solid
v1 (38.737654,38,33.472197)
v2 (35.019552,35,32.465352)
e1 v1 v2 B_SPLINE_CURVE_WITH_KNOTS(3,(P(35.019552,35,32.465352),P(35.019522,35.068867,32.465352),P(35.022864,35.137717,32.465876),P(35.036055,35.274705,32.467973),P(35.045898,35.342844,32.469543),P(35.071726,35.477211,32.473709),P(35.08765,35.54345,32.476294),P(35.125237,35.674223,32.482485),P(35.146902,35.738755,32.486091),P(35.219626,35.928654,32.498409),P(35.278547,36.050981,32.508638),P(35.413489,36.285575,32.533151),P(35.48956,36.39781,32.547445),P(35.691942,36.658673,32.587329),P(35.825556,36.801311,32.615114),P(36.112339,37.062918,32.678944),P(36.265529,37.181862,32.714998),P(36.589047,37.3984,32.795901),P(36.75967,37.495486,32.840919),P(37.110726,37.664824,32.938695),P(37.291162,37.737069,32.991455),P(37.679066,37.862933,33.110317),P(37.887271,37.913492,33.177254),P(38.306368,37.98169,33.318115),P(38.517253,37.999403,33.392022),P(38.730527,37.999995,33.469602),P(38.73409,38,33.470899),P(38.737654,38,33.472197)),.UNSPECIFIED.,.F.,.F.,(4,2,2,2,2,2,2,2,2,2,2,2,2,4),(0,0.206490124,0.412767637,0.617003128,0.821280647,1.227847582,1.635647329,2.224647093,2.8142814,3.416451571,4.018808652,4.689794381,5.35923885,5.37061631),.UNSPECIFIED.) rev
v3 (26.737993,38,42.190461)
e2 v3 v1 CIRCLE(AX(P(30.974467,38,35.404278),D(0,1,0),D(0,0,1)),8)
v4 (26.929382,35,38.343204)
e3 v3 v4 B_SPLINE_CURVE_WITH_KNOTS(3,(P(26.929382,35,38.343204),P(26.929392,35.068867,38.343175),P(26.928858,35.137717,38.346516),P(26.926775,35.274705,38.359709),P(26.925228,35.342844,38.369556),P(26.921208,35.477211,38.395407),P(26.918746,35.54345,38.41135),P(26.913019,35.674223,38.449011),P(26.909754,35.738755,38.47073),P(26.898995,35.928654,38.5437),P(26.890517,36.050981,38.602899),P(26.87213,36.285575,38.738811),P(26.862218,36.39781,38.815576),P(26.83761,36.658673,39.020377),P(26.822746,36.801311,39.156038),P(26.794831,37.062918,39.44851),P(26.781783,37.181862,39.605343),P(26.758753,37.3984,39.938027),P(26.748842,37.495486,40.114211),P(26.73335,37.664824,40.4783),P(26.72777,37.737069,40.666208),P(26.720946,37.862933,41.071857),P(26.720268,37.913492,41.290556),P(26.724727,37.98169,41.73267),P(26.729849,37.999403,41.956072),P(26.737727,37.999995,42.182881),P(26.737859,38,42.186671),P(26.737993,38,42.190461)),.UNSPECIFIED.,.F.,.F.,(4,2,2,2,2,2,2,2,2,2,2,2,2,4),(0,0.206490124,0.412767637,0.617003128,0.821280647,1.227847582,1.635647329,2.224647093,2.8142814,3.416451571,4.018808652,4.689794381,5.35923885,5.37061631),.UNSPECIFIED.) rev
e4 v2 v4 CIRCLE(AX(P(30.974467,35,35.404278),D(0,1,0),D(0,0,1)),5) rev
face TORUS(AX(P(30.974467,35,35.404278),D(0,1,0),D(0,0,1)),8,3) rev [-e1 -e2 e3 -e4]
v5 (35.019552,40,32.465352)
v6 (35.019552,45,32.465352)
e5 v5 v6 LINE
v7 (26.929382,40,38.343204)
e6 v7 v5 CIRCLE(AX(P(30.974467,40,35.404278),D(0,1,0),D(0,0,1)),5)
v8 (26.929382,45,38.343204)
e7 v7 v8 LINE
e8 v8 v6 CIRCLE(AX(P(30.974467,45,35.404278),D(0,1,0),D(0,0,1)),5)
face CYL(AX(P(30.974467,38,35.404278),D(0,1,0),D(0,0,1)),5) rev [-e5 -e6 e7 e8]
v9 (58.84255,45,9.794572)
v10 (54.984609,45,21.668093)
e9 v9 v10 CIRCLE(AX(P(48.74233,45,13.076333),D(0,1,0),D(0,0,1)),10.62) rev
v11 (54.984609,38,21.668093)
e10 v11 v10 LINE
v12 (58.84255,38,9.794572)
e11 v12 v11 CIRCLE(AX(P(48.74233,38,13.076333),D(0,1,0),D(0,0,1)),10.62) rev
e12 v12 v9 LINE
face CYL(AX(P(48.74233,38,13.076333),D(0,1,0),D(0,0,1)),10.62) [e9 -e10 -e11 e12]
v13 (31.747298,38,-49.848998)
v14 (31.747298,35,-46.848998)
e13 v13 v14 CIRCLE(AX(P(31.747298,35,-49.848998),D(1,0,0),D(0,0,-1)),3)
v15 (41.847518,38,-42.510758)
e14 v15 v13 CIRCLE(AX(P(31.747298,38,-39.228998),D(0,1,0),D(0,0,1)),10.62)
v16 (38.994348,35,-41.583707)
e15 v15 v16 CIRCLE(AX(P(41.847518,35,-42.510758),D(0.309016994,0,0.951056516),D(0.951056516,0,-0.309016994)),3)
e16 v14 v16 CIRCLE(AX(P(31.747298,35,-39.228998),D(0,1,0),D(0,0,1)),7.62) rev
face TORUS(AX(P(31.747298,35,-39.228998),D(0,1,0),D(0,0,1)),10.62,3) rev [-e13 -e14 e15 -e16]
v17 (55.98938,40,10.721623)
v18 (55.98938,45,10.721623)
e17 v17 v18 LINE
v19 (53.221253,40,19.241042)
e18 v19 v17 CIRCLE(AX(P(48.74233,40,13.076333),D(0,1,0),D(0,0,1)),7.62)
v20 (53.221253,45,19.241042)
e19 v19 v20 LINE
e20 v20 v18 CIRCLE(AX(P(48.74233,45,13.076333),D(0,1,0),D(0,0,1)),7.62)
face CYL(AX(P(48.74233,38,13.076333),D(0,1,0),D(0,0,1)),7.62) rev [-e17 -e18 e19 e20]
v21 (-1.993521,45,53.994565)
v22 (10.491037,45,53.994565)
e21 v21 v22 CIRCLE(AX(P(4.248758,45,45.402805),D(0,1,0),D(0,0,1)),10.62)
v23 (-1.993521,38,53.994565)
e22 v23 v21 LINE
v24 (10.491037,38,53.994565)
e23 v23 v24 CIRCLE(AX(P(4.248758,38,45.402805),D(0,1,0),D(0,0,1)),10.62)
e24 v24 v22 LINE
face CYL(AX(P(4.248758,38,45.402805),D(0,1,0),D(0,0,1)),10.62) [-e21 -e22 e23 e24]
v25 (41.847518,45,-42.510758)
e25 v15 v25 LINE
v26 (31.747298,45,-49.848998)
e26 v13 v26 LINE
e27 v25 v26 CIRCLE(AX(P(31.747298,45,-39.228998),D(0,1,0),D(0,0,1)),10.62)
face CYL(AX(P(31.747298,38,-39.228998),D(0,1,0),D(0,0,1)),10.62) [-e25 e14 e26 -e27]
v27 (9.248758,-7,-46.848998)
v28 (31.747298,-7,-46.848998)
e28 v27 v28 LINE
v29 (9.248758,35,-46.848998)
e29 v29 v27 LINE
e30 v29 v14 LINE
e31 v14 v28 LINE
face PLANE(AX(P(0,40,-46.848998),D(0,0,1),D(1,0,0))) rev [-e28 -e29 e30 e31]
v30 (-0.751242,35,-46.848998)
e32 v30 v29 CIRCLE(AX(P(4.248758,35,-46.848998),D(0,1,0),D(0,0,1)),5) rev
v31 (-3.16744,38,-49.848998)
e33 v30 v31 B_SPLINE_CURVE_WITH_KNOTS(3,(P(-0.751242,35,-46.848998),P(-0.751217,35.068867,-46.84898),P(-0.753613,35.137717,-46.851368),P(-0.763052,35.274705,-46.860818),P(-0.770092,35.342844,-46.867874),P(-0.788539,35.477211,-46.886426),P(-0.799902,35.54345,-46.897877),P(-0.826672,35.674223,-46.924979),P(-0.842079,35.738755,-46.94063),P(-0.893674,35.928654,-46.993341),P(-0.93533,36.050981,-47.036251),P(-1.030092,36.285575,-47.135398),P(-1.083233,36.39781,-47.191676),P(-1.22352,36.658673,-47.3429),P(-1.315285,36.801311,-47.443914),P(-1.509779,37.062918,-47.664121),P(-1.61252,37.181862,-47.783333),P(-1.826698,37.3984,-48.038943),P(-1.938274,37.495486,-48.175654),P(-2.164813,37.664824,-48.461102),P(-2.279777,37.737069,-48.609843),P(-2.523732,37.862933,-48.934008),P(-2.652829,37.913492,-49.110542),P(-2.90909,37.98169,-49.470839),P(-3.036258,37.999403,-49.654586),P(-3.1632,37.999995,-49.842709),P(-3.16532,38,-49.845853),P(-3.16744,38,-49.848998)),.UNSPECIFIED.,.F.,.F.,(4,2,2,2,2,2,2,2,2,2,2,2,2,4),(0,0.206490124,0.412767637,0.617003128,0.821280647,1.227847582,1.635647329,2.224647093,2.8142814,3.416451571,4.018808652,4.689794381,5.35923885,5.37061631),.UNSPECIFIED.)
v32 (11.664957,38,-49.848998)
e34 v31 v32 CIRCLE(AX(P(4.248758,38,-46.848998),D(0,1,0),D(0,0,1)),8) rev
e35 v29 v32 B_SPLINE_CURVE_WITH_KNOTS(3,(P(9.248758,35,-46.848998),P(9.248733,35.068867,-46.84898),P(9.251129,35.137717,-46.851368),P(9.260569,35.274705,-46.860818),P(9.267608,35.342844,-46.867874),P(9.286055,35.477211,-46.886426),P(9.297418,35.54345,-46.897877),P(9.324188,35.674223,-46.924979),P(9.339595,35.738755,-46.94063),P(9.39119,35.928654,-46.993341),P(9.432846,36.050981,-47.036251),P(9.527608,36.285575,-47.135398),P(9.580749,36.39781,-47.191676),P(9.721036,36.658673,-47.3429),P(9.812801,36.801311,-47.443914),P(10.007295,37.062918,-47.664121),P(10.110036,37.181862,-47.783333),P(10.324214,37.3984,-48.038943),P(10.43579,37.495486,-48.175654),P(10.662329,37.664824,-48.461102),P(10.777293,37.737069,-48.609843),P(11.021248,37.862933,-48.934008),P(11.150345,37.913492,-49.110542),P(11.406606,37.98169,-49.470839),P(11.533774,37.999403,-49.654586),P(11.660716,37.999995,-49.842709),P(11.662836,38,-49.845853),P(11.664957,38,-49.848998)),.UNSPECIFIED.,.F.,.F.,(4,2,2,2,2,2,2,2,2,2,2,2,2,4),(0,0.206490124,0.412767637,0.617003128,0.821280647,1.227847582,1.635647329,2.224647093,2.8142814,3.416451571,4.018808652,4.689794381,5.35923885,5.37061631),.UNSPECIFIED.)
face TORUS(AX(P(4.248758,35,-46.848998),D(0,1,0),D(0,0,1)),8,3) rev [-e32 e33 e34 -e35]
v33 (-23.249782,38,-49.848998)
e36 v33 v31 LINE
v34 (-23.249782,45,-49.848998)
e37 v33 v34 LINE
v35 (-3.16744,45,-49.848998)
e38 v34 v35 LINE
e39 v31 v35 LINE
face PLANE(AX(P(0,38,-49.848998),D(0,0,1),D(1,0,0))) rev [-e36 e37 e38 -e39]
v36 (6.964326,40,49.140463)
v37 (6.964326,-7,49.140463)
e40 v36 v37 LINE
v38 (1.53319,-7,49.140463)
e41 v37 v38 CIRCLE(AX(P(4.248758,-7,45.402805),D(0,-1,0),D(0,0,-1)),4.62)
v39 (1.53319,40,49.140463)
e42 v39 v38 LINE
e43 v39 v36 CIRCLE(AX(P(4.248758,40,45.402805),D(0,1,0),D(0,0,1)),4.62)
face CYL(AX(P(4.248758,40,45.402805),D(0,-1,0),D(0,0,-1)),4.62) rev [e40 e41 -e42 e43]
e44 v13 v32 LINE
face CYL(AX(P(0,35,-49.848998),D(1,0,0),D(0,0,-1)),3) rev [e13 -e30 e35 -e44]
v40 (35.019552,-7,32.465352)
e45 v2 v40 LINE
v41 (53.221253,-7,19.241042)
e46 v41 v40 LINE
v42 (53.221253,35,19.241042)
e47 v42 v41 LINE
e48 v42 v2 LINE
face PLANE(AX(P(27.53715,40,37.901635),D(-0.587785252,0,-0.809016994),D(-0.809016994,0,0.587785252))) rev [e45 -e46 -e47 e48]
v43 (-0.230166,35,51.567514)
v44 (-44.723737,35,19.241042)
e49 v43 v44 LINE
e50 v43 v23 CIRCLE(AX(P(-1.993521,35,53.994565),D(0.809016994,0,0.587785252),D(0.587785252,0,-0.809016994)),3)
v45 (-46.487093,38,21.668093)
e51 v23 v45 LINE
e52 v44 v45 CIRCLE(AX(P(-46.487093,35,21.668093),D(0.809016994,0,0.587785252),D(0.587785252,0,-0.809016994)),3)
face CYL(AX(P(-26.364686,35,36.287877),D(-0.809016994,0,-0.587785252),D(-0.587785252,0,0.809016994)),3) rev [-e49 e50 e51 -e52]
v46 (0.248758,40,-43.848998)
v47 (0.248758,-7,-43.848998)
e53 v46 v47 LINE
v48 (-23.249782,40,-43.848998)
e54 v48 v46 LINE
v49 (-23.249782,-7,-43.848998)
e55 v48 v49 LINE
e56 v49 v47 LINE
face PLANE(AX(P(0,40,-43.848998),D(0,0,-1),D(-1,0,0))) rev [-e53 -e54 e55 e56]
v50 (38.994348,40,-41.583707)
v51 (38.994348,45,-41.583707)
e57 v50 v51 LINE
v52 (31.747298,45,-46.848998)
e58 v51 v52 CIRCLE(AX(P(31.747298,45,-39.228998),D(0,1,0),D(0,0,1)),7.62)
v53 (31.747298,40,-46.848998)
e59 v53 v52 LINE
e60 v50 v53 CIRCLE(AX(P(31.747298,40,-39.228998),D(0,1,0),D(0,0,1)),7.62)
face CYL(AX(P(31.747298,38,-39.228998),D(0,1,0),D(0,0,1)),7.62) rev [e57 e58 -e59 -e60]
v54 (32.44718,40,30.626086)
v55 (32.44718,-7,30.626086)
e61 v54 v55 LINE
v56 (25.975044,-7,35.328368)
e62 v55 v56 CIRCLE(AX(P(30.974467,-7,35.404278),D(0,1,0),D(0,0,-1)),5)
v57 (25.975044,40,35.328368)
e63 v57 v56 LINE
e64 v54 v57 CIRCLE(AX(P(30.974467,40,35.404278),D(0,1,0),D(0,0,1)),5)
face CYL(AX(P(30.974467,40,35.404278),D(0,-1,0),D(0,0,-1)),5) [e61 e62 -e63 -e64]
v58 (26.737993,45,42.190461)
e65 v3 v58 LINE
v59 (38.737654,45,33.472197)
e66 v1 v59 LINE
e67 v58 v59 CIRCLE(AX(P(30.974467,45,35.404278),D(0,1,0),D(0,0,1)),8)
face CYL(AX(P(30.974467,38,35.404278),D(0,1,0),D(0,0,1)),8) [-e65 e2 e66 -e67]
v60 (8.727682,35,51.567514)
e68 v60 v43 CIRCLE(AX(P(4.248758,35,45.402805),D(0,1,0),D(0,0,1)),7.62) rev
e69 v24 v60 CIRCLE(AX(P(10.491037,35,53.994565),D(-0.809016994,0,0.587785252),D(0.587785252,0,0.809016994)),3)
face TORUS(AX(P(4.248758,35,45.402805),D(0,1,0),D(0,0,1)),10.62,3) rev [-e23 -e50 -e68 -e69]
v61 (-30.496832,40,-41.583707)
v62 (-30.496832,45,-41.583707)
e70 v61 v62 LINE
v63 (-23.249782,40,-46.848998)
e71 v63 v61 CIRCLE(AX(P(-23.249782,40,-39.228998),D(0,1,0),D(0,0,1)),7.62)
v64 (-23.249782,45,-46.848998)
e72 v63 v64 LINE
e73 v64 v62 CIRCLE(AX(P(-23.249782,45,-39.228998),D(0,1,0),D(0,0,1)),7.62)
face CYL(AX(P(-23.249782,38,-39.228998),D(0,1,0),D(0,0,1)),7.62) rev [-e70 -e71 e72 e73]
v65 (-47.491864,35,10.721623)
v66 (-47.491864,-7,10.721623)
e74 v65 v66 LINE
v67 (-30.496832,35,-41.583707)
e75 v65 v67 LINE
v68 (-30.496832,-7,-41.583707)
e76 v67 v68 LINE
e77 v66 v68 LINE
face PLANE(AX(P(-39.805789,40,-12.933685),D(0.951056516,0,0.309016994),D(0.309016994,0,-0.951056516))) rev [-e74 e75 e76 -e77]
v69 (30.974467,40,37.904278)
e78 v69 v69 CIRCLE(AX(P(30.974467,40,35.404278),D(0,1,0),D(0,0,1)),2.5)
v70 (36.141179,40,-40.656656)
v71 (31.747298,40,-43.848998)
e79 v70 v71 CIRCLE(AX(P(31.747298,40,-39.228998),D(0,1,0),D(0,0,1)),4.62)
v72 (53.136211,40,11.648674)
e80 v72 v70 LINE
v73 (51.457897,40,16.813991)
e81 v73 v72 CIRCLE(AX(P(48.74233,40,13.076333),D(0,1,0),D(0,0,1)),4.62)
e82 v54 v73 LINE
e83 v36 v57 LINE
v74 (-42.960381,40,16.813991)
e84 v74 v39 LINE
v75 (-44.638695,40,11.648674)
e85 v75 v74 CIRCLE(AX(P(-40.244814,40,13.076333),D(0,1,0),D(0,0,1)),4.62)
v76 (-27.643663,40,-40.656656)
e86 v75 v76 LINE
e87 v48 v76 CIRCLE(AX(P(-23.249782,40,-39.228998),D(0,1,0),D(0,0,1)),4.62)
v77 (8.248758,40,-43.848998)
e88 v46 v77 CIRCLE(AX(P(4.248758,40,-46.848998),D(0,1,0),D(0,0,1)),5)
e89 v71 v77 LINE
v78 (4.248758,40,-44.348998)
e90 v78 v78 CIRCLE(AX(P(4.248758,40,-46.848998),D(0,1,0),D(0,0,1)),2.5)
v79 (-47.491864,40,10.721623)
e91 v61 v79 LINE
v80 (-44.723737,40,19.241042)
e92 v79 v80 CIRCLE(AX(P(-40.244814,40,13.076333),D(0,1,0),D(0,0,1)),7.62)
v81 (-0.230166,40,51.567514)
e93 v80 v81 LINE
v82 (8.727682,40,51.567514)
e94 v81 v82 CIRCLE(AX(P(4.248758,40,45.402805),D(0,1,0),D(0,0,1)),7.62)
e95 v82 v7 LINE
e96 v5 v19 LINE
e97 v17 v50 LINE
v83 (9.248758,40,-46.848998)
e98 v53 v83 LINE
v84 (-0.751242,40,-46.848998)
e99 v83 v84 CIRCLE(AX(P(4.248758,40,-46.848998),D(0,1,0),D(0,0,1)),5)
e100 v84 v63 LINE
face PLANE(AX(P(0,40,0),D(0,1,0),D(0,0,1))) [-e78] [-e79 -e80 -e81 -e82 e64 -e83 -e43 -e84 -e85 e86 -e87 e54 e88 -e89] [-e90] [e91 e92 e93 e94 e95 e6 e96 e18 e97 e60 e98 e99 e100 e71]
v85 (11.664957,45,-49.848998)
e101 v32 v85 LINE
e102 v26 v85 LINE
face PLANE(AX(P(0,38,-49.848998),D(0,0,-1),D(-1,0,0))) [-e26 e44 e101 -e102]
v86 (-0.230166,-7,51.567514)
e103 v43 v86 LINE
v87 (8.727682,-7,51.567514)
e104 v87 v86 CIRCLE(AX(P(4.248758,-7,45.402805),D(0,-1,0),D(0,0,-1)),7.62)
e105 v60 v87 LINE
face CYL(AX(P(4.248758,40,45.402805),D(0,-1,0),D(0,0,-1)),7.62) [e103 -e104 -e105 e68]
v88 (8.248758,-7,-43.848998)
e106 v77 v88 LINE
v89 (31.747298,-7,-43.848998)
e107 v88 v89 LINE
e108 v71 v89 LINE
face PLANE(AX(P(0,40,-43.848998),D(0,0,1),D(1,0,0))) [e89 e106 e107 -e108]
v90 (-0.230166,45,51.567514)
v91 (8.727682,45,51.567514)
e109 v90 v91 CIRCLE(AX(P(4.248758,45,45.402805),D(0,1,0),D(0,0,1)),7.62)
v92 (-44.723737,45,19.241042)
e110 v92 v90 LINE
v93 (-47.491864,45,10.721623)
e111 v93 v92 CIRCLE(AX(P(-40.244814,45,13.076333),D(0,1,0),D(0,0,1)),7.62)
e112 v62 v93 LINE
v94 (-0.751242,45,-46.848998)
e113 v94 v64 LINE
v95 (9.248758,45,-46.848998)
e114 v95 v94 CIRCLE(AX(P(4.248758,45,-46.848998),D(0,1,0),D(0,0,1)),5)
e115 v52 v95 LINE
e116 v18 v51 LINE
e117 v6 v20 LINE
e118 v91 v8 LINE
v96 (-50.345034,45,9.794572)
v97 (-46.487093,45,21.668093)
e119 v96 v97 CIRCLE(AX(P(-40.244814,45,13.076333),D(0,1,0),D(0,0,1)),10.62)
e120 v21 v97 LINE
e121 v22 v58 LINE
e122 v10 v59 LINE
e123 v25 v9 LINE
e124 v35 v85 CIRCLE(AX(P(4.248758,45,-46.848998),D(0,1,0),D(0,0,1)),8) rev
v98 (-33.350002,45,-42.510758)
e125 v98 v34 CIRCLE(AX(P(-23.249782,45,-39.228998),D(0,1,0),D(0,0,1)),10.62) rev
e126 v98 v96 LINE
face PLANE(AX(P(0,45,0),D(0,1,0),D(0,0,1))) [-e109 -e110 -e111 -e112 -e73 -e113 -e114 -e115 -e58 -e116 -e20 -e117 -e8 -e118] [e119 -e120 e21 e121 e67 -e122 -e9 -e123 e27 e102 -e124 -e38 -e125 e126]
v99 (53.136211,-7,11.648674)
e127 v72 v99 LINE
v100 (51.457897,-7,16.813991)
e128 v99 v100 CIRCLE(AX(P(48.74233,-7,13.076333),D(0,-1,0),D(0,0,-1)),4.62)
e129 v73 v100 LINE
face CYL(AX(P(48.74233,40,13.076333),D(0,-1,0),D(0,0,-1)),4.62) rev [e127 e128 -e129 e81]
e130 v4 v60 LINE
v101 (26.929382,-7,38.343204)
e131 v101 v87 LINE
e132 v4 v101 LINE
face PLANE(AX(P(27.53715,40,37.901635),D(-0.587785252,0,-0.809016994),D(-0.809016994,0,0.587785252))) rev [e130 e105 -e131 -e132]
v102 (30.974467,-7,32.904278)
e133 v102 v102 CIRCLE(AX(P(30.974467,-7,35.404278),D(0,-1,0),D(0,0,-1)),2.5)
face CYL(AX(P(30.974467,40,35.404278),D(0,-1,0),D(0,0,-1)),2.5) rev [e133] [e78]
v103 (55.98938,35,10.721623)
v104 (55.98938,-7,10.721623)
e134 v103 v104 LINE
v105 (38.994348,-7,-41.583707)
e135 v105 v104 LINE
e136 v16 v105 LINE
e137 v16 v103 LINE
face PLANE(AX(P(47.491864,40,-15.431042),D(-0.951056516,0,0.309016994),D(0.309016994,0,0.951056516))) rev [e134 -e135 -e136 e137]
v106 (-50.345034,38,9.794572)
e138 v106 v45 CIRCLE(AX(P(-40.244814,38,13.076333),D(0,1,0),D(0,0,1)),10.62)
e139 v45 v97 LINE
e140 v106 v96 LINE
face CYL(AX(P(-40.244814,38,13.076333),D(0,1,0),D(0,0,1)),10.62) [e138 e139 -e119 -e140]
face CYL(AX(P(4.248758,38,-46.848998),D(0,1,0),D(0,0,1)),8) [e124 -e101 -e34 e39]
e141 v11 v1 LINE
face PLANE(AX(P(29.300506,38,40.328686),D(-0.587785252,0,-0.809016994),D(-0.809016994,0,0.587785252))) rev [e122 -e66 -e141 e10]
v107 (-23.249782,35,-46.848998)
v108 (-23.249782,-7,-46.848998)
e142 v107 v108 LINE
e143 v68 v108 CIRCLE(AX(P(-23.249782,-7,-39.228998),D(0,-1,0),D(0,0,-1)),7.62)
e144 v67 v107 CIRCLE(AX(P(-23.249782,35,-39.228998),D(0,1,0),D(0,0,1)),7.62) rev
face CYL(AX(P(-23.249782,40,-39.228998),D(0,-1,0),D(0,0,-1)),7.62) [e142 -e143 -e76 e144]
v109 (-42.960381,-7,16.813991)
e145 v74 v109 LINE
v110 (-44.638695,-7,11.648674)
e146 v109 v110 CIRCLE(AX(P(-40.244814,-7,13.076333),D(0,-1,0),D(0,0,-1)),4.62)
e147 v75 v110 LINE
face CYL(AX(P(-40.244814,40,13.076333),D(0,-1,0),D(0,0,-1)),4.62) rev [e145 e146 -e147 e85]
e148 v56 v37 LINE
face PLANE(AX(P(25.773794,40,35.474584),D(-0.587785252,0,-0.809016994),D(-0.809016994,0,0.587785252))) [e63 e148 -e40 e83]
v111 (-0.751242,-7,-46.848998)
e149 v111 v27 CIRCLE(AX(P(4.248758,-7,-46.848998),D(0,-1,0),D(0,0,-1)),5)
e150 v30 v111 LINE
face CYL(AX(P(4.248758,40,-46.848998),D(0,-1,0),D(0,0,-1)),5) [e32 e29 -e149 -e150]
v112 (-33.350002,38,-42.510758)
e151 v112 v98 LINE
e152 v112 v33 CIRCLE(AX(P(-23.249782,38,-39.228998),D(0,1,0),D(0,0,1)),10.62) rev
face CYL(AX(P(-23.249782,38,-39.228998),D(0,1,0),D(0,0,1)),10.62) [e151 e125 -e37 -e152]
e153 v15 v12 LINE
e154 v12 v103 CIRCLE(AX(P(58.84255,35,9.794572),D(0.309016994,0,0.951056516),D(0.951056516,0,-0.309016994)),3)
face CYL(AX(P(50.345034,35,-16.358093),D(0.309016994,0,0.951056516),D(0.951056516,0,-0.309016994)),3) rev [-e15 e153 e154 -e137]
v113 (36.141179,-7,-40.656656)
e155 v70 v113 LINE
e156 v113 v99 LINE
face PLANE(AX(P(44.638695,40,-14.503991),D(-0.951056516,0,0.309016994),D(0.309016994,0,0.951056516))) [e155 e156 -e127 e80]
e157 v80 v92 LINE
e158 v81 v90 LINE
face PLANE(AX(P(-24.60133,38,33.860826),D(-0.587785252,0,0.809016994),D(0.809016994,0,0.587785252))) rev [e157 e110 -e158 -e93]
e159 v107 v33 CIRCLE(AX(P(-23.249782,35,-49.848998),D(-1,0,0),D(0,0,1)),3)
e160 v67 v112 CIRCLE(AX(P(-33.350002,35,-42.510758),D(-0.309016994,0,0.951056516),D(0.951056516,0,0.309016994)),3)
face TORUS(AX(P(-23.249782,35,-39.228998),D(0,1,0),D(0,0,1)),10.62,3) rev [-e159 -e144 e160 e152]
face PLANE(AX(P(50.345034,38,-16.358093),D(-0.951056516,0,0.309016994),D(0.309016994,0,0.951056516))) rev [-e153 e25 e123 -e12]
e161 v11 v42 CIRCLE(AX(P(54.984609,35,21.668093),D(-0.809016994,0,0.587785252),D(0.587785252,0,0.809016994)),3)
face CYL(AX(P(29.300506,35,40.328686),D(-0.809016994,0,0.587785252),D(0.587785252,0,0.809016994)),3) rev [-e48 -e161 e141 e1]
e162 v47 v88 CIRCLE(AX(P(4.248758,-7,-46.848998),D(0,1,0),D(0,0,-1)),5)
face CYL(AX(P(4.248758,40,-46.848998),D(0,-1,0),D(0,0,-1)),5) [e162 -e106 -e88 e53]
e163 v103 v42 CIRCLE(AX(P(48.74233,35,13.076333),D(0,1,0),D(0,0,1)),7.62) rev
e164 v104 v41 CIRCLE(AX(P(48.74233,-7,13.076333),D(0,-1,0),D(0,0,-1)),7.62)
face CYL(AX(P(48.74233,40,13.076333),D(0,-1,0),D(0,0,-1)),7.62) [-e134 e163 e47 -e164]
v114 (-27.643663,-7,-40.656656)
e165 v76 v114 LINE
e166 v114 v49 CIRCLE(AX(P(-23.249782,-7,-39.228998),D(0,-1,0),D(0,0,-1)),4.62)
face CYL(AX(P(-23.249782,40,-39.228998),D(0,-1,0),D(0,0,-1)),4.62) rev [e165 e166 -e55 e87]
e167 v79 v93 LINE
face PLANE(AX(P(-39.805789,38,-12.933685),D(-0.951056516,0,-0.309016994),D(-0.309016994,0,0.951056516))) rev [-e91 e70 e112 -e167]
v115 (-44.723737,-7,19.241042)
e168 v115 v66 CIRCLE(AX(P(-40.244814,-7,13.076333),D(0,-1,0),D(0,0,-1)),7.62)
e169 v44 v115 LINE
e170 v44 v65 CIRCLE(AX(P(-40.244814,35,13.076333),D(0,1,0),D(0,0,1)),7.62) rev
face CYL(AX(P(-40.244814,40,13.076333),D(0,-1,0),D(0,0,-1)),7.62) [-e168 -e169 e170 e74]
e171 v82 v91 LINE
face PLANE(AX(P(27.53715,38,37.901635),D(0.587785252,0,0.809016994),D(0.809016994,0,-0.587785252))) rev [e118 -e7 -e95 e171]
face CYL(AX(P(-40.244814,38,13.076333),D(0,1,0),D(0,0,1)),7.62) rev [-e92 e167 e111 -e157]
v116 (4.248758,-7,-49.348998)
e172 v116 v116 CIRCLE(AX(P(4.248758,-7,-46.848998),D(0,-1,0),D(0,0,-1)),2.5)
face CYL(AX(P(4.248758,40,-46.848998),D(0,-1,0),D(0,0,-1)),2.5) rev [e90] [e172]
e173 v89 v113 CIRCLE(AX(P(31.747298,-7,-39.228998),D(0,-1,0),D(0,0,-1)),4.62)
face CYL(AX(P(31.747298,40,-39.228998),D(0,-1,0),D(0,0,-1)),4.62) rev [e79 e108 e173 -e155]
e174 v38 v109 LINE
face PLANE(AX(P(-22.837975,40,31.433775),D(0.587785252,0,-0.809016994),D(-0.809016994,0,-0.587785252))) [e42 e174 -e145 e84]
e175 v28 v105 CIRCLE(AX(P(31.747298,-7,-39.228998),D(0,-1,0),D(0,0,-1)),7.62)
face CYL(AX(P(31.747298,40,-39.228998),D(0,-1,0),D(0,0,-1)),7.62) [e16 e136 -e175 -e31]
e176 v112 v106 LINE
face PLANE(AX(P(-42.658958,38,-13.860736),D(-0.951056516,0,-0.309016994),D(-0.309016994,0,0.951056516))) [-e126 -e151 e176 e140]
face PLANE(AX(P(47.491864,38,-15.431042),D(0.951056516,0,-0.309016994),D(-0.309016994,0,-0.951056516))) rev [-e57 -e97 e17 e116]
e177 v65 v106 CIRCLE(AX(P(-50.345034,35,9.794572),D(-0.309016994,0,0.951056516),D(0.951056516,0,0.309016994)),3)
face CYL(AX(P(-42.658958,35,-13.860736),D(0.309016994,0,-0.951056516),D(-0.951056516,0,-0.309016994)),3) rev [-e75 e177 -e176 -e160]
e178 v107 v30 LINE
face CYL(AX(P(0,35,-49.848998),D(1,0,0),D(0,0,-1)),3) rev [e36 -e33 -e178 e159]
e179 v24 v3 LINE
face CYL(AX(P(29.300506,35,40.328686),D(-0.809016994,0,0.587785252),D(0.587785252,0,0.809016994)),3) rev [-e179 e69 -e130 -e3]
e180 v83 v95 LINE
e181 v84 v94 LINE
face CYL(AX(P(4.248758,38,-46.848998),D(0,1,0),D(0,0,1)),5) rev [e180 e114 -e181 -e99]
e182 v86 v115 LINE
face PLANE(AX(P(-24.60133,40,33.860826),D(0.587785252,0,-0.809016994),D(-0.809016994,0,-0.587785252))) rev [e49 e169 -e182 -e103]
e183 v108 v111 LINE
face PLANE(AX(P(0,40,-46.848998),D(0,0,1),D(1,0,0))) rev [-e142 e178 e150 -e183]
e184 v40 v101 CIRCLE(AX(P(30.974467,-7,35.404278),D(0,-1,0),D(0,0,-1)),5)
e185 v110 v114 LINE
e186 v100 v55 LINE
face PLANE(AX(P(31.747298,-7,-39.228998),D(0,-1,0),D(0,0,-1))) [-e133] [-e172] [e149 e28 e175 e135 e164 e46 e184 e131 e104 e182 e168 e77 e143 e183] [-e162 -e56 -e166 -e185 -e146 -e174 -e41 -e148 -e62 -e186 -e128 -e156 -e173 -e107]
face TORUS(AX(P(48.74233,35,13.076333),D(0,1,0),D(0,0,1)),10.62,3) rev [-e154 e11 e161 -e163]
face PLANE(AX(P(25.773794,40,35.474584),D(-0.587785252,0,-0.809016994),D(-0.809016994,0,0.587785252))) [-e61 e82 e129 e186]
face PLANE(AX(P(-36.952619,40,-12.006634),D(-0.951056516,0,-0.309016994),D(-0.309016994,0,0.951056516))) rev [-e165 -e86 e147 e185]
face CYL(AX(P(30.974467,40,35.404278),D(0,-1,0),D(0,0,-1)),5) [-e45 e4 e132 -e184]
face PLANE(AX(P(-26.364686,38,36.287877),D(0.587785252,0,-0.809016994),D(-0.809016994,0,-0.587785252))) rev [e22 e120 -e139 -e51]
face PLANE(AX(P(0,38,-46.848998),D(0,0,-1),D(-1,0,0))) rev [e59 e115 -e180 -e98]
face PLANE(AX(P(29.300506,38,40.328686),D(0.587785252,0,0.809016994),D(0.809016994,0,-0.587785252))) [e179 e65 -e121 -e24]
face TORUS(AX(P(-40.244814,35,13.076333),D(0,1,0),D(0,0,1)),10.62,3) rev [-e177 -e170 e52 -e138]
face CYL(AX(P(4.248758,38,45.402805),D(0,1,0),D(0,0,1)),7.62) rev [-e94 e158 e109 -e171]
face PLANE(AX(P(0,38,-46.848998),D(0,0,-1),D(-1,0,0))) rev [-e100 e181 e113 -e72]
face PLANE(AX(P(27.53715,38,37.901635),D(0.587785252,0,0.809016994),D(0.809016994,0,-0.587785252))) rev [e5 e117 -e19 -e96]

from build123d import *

# Parameters (mm, degrees)
SKETCH1_R                = 2.5
BOSS_EXTRUDE1_DEPTH      = 40
BOSS_EXTRUDE2_DEPTH      = 5
BOSS_EXTRUDE2_DEPTH_BACK = 2
FILLET1_R                = 3
BOSS_EXTRUDE3_START      = 7
SKETCH3_R                = 2.5
BOSS_EXTRUDE3_DEPTH      = 7


with BuildPart() as part:
    # Sketch1 → Boss-Extrude1 (new body)
    # profile 1 of 3: a face of its own
    with BuildSketch(Plane(origin=(0, 0, 0), x_dir=(1, 0, 0), z_dir=(0, 1, 0))):
        with BuildLine():
            Line((55.989380272, -10.721623107), (38.994348201, 41.58370731))
            ThreePointArc((38.994348201, 41.58370731), (36.22622117, 45.39370731), (31.747297547, 46.848997812))
            Line((31.747297547, 46.848997812), (9.248758018, 46.848997812))
            ThreePointArc((9.248758018, 46.848997812), (7.784291924, 50.384531718), (4.248758018, 51.848997812))
            Line((4.248758018, 51.848997812), (4.248758018, 50.848997812))
            ThreePointArc((4.248758018, 50.848997812), (1.420330893, 49.677424937), (0.248758018, 46.848997812))
            Line((0.248758018, 46.848997812), (-23.249781512, 46.848997812))
            ThreePointArc((-23.249781512, 46.848997812), (-27.728705135, 45.39370731), (-30.496832166, 41.58370731))
            Line((-30.496832166, 41.58370731), (-47.491864237, -10.721623107))
            ThreePointArc((-47.491864237, -10.721623107), (-47.491864237, -15.431042101), (-44.723737205, -19.241042101))
            Line((-44.723737205, -19.241042101), (-0.230165605, -51.567514092))
            ThreePointArc((-0.230165605, -51.567514092), (4.248758018, -53.022804594), (8.72768164, -51.567514092))
            Line((8.72768164, -51.567514092), (27.738399463, -37.755419106))
            ThreePointArc((27.738399463, -37.755419106), (30.34872958, -39.355031459), (33.325608449, -38.640346074))
            Line((33.325608449, -38.640346074), (33.913393702, -39.449363068))
            ThreePointArc((33.913393702, -39.449363068), (35.912909143, -36.186450422), (35.019552412, -32.465351835))
            Line((35.019552412, -32.465351835), (53.22125324, -19.241042101))
            ThreePointArc((53.22125324, -19.241042101), (55.989380272, -15.431042101), (55.989380272, -10.721623107))
        make_face()
        with Locations(Location((4.248758018, 46.848997812, 0), (0, 0, 270))):
            Circle(SKETCH1_R, mode=Mode.SUBTRACT)
        with Locations(Location((30.97446744, -35.404278096, 0), (0, 0, 270))):
            Circle(SKETCH1_R, mode=Mode.SUBTRACT)
        with BuildLine():
            ThreePointArc((-23.249781512, 43.848997812), (-25.965349378, 42.966656326), (-27.643662617, 40.656656326))
            Line((-27.643662617, 40.656656326), (-44.638694688, -11.64867409))
            ThreePointArc((-44.638694688, -11.64867409), (-44.638694688, -14.503991118), (-42.960381448, -16.813991118))
            Line((-42.960381448, -16.813991118), (1.533190152, -49.140463108))
            ThreePointArc((1.533190152, -49.140463108), (4.248758018, -50.022804594), (6.964325883, -49.140463108))
            Line((6.964325883, -49.140463108), (25.975043706, -35.328368122))
            ThreePointArc((25.975043706, -35.328368122), (28.035541179, -31.359193125), (32.447179661, -30.626086104))
            Line((32.447179661, -30.626086104), (51.457897483, -16.813991118))
            ThreePointArc((51.457897483, -16.813991118), (53.136210723, -14.503991118), (53.136210723, -11.64867409))
            Line((53.136210723, -11.64867409), (36.141178653, 40.656656326))
            ThreePointArc((36.141178653, 40.656656326), (34.462865413, 42.966656326), (31.747297547, 43.848997812))
            Line((31.747297547, 43.848997812), (8.248758018, 43.848997812))
            ThreePointArc((8.248758018, 43.848997812), (4.248758018, 41.848997812), (0.248758018, 43.848997812))
            Line((0.248758018, 43.848997812), (-23.249781512, 43.848997812))
        make_face(mode=Mode.SUBTRACT)
    # profile 2 of 3: a face of its own
    with BuildSketch(Plane(origin=(0, 0, 0), x_dir=(1, 0, 0), z_dir=(0, 1, 0))):
        with BuildLine():
            ThreePointArc((26.929382468, -38.343204358), (30.192295115, -40.342719799), (33.913393702, -39.449363068))
            Line((33.913393702, -39.449363068), (33.325608449, -38.640346074))
            ThreePointArc((33.325608449, -38.640346074), (30.34872958, -39.355031459), (27.738399463, -37.755419106))
            Line((27.738399463, -37.755419106), (26.929382468, -38.343204358))
        make_face()
    # profile 3 of 3: a face of its own
    with BuildSketch(Plane(origin=(0, 0, 0), x_dir=(1, 0, 0), z_dir=(0, 1, 0))):
        with BuildLine():
            Line((4.248758018, 50.848997812), (4.248758018, 51.848997812))
            ThreePointArc((4.248758018, 51.848997812), (0.713224112, 50.384531718), (-0.751241982, 46.848997812))
            Line((-0.751241982, 46.848997812), (0.248758018, 46.848997812))
            ThreePointArc((0.248758018, 46.848997812), (1.420330893, 49.677424937), (4.248758018, 50.848997812))
        make_face()
    extrude(amount=BOSS_EXTRUDE1_DEPTH)

    # Sketch2 → Boss-Extrude2 (add, two sides: drawn at the far end of the back side and taken through both)
    with BuildSketch(Plane(origin=(0, 40, 0), x_dir=(1, 0, 0), z_dir=(0, 1, 0)).offset(-BOSS_EXTRUDE2_DEPTH_BACK)):
        Polygon((-30.496832166, 41.58370731), (-33.350001715, 42.510758293), (-50.345033785, -9.794572124), (-47.491864237, -10.721623107), align=None)
        with BuildLine():
            Line((-1.993521362, -53.994565075), (-46.487092962, -21.668093084))
            ThreePointArc((-46.487092962, -21.668093084), (-50.345033785, -16.358093084), (-50.345033785, -9.794572124))
            Line((-50.345033785, -9.794572124), (-47.491864237, -10.721623107))
            ThreePointArc((-47.491864237, -10.721623107), (-47.491864237, -15.431042101), (-44.723737205, -19.241042101))
            Line((-44.723737205, -19.241042101), (-0.230165605, -51.567514092))
            ThreePointArc((-0.230165605, -51.567514092), (4.248758018, -53.022804594), (8.72768164, -51.567514092))
            Line((8.72768164, -51.567514092), (26.929382468, -38.343204358))
            ThreePointArc((26.929382468, -38.343204358), (33.913393702, -39.449363068), (35.019552412, -32.465351835))
            Line((35.019552412, -32.465351835), (53.22125324, -19.241042101))
            ThreePointArc((53.22125324, -19.241042101), (55.989380272, -15.431042101), (55.989380272, -10.721623107))
            Line((55.989380272, -10.721623107), (38.994348201, 41.58370731))
            ThreePointArc((38.994348201, 41.58370731), (36.22622117, 45.39370731), (31.747297547, 46.848997812))
            Line((31.747297547, 46.848997812), (9.248758018, 46.848997812))
            ThreePointArc((9.248758018, 46.848997812), (4.248758018, 51.848997812), (-0.751241982, 46.848997812))
            Line((-0.751241982, 46.848997812), (-23.249781512, 46.848997812))
            Line((-23.249781512, 46.848997812), (-23.249781512, 49.848997812))
            Line((-23.249781512, 49.848997812), (-3.16744047, 49.848997812))
            ThreePointArc((-3.16744047, 49.848997812), (4.248758018, 54.848997812), (11.664956505, 49.848997812))
            Line((11.664956505, 49.848997812), (31.747297547, 49.848997812))
            ThreePointArc((31.747297547, 49.848997812), (37.989576927, 47.820758293), (41.84751775, 42.510758293))
            Line((41.84751775, 42.510758293), (58.842549821, -9.794572124))
            ThreePointArc((58.842549821, -9.794572124), (58.842549821, -16.358093084), (54.984608997, -21.668093084))
            Line((54.984608997, -21.668093084), (38.737653807, -33.472196981))
            ThreePointArc((38.737653807, -33.472196981), (35.676749458, -41.876414051), (26.737992587, -42.190461178))
            Line((26.737992587, -42.190461178), (10.491037397, -53.994565075))
            ThreePointArc((10.491037397, -53.994565075), (4.248758018, -56.022804594), (-1.993521362, -53.994565075))
        make_face()
        with BuildLine():
            ThreePointArc((-33.350001715, 42.510758293), (-29.492060891, 47.820758293), (-23.249781512, 49.848997812))
            Line((-23.249781512, 49.848997812), (-23.249781512, 46.848997812))
            ThreePointArc((-23.249781512, 46.848997812), (-27.728705135, 45.39370731), (-30.496832166, 41.58370731))
            Line((-30.496832166, 41.58370731), (-33.350001715, 42.510758293))
        make_face()
    extrude(amount=BOSS_EXTRUDE2_DEPTH + BOSS_EXTRUDE2_DEPTH_BACK)

    # Fillet1
    fillet1_edges = [part.edges().sort_by_distance(p)[0] for p in [
        (-38.994348201, 38, -15.431042101),
        (-47.491864237, 38, 15.431042101),
        (-22.476951405, 38, 35.404278096),
        (4.248758018, 38, 53.022804594),
        (17.828532054, 38, 44.955359225),
        (33.913393702, 38, 39.449363068),
        (44.120402826, 38, 25.853196968),
        (55.989380272, 38, 15.431042101),
        (47.491864237, 38, -15.431042101),
        (36.22622117, 38, -45.39370731),
        (20.498027782, 38, -46.848997812),
        (4.248758018, 38, -51.848997812),
        (-12.000511747, 38, -46.848997812),
        (-27.728705135, 38, -45.39370731),
    ]]
    fillet(fillet1_edges, radius=FILLET1_R - 0.0001)  # a hair under: the kernel refuses the full size

    # Sketch3 → Boss-Extrude3 (add)
    with BuildSketch(Plane.XZ.offset(BOSS_EXTRUDE3_START)):
        with BuildLine():
            Line((38.994348201, -41.58370731), (55.989380272, 10.721623107))
            ThreePointArc((55.989380272, 10.721623107), (55.989380272, 15.431042101), (53.22125324, 19.241042101))
            Line((53.22125324, 19.241042101), (35.019552412, 32.465351835))
            ThreePointArc((35.019552412, 32.465351835), (33.913393702, 39.449363068), (26.929382468, 38.343204358))
            Line((26.929382468, 38.343204358), (8.72768164, 51.567514092))
            ThreePointArc((8.72768164, 51.567514092), (4.248758018, 53.022804594), (-0.230165605, 51.567514092))
            Line((-0.230165605, 51.567514092), (-44.723737205, 19.241042101))
            ThreePointArc((-44.723737205, 19.241042101), (-47.491864237, 15.431042101), (-47.491864237, 10.721623107))
            Line((-47.491864237, 10.721623107), (-30.496832166, -41.58370731))
            ThreePointArc((-30.496832166, -41.58370731), (-27.728705135, -45.39370731), (-23.249781512, -46.848997812))
            Line((-23.249781512, -46.848997812), (-0.751241982, -46.848997812))
            ThreePointArc((-0.751241982, -46.848997812), (4.248758018, -51.848997812), (9.248758018, -46.848997812))
            Line((9.248758018, -46.848997812), (31.747297547, -46.848997812))
            ThreePointArc((31.747297547, -46.848997812), (36.22622117, -45.39370731), (38.994348201, -41.58370731))
        make_face()
        with Locations(Location((30.97446744, 35.404278096, 0), (0, 0, 270))):
            Circle(SKETCH3_R, mode=Mode.SUBTRACT)
        with Locations(Location((4.248758018, -46.848997812, 0), (0, 0, 270))):
            Circle(SKETCH3_R, mode=Mode.SUBTRACT)
        with BuildLine():
            Line((-44.638694688, 11.64867409), (-27.643662617, -40.656656326))
            ThreePointArc((-27.643662617, -40.656656326), (-25.965349378, -42.966656326), (-23.249781512, -43.848997812))
            Line((-23.249781512, -43.848997812), (0.248758018, -43.848997812))
            ThreePointArc((0.248758018, -43.848997812), (4.248758018, -41.848997812), (8.248758018, -43.848997812))
            Line((8.248758018, -43.848997812), (31.747297547, -43.848997812))
            ThreePointArc((31.747297547, -43.848997812), (34.462865413, -42.966656326), (36.141178653, -40.656656326))
            Line((36.141178653, -40.656656326), (53.136210723, 11.64867409))
            ThreePointArc((53.136210723, 11.64867409), (53.136210723, 14.503991118), (51.457897483, 16.813991118))
            Line((51.457897483, 16.813991118), (32.447179661, 30.626086104))
            ThreePointArc((32.447179661, 30.626086104), (28.035541179, 31.359193125), (25.975043706, 35.328368122))
            Line((25.975043706, 35.328368122), (6.964325883, 49.140463108))
            ThreePointArc((6.964325883, 49.140463108), (4.248758018, 50.022804594), (1.533190152, 49.140463108))
            Line((1.533190152, 49.140463108), (-42.960381448, 16.813991118))
            ThreePointArc((-42.960381448, 16.813991118), (-44.638694688, 14.503991118), (-44.638694688, 11.64867409))
        make_face(mode=Mode.SUBTRACT)
    extrude(amount=-BOSS_EXTRUDE3_DEPTH)


solid = part.part
